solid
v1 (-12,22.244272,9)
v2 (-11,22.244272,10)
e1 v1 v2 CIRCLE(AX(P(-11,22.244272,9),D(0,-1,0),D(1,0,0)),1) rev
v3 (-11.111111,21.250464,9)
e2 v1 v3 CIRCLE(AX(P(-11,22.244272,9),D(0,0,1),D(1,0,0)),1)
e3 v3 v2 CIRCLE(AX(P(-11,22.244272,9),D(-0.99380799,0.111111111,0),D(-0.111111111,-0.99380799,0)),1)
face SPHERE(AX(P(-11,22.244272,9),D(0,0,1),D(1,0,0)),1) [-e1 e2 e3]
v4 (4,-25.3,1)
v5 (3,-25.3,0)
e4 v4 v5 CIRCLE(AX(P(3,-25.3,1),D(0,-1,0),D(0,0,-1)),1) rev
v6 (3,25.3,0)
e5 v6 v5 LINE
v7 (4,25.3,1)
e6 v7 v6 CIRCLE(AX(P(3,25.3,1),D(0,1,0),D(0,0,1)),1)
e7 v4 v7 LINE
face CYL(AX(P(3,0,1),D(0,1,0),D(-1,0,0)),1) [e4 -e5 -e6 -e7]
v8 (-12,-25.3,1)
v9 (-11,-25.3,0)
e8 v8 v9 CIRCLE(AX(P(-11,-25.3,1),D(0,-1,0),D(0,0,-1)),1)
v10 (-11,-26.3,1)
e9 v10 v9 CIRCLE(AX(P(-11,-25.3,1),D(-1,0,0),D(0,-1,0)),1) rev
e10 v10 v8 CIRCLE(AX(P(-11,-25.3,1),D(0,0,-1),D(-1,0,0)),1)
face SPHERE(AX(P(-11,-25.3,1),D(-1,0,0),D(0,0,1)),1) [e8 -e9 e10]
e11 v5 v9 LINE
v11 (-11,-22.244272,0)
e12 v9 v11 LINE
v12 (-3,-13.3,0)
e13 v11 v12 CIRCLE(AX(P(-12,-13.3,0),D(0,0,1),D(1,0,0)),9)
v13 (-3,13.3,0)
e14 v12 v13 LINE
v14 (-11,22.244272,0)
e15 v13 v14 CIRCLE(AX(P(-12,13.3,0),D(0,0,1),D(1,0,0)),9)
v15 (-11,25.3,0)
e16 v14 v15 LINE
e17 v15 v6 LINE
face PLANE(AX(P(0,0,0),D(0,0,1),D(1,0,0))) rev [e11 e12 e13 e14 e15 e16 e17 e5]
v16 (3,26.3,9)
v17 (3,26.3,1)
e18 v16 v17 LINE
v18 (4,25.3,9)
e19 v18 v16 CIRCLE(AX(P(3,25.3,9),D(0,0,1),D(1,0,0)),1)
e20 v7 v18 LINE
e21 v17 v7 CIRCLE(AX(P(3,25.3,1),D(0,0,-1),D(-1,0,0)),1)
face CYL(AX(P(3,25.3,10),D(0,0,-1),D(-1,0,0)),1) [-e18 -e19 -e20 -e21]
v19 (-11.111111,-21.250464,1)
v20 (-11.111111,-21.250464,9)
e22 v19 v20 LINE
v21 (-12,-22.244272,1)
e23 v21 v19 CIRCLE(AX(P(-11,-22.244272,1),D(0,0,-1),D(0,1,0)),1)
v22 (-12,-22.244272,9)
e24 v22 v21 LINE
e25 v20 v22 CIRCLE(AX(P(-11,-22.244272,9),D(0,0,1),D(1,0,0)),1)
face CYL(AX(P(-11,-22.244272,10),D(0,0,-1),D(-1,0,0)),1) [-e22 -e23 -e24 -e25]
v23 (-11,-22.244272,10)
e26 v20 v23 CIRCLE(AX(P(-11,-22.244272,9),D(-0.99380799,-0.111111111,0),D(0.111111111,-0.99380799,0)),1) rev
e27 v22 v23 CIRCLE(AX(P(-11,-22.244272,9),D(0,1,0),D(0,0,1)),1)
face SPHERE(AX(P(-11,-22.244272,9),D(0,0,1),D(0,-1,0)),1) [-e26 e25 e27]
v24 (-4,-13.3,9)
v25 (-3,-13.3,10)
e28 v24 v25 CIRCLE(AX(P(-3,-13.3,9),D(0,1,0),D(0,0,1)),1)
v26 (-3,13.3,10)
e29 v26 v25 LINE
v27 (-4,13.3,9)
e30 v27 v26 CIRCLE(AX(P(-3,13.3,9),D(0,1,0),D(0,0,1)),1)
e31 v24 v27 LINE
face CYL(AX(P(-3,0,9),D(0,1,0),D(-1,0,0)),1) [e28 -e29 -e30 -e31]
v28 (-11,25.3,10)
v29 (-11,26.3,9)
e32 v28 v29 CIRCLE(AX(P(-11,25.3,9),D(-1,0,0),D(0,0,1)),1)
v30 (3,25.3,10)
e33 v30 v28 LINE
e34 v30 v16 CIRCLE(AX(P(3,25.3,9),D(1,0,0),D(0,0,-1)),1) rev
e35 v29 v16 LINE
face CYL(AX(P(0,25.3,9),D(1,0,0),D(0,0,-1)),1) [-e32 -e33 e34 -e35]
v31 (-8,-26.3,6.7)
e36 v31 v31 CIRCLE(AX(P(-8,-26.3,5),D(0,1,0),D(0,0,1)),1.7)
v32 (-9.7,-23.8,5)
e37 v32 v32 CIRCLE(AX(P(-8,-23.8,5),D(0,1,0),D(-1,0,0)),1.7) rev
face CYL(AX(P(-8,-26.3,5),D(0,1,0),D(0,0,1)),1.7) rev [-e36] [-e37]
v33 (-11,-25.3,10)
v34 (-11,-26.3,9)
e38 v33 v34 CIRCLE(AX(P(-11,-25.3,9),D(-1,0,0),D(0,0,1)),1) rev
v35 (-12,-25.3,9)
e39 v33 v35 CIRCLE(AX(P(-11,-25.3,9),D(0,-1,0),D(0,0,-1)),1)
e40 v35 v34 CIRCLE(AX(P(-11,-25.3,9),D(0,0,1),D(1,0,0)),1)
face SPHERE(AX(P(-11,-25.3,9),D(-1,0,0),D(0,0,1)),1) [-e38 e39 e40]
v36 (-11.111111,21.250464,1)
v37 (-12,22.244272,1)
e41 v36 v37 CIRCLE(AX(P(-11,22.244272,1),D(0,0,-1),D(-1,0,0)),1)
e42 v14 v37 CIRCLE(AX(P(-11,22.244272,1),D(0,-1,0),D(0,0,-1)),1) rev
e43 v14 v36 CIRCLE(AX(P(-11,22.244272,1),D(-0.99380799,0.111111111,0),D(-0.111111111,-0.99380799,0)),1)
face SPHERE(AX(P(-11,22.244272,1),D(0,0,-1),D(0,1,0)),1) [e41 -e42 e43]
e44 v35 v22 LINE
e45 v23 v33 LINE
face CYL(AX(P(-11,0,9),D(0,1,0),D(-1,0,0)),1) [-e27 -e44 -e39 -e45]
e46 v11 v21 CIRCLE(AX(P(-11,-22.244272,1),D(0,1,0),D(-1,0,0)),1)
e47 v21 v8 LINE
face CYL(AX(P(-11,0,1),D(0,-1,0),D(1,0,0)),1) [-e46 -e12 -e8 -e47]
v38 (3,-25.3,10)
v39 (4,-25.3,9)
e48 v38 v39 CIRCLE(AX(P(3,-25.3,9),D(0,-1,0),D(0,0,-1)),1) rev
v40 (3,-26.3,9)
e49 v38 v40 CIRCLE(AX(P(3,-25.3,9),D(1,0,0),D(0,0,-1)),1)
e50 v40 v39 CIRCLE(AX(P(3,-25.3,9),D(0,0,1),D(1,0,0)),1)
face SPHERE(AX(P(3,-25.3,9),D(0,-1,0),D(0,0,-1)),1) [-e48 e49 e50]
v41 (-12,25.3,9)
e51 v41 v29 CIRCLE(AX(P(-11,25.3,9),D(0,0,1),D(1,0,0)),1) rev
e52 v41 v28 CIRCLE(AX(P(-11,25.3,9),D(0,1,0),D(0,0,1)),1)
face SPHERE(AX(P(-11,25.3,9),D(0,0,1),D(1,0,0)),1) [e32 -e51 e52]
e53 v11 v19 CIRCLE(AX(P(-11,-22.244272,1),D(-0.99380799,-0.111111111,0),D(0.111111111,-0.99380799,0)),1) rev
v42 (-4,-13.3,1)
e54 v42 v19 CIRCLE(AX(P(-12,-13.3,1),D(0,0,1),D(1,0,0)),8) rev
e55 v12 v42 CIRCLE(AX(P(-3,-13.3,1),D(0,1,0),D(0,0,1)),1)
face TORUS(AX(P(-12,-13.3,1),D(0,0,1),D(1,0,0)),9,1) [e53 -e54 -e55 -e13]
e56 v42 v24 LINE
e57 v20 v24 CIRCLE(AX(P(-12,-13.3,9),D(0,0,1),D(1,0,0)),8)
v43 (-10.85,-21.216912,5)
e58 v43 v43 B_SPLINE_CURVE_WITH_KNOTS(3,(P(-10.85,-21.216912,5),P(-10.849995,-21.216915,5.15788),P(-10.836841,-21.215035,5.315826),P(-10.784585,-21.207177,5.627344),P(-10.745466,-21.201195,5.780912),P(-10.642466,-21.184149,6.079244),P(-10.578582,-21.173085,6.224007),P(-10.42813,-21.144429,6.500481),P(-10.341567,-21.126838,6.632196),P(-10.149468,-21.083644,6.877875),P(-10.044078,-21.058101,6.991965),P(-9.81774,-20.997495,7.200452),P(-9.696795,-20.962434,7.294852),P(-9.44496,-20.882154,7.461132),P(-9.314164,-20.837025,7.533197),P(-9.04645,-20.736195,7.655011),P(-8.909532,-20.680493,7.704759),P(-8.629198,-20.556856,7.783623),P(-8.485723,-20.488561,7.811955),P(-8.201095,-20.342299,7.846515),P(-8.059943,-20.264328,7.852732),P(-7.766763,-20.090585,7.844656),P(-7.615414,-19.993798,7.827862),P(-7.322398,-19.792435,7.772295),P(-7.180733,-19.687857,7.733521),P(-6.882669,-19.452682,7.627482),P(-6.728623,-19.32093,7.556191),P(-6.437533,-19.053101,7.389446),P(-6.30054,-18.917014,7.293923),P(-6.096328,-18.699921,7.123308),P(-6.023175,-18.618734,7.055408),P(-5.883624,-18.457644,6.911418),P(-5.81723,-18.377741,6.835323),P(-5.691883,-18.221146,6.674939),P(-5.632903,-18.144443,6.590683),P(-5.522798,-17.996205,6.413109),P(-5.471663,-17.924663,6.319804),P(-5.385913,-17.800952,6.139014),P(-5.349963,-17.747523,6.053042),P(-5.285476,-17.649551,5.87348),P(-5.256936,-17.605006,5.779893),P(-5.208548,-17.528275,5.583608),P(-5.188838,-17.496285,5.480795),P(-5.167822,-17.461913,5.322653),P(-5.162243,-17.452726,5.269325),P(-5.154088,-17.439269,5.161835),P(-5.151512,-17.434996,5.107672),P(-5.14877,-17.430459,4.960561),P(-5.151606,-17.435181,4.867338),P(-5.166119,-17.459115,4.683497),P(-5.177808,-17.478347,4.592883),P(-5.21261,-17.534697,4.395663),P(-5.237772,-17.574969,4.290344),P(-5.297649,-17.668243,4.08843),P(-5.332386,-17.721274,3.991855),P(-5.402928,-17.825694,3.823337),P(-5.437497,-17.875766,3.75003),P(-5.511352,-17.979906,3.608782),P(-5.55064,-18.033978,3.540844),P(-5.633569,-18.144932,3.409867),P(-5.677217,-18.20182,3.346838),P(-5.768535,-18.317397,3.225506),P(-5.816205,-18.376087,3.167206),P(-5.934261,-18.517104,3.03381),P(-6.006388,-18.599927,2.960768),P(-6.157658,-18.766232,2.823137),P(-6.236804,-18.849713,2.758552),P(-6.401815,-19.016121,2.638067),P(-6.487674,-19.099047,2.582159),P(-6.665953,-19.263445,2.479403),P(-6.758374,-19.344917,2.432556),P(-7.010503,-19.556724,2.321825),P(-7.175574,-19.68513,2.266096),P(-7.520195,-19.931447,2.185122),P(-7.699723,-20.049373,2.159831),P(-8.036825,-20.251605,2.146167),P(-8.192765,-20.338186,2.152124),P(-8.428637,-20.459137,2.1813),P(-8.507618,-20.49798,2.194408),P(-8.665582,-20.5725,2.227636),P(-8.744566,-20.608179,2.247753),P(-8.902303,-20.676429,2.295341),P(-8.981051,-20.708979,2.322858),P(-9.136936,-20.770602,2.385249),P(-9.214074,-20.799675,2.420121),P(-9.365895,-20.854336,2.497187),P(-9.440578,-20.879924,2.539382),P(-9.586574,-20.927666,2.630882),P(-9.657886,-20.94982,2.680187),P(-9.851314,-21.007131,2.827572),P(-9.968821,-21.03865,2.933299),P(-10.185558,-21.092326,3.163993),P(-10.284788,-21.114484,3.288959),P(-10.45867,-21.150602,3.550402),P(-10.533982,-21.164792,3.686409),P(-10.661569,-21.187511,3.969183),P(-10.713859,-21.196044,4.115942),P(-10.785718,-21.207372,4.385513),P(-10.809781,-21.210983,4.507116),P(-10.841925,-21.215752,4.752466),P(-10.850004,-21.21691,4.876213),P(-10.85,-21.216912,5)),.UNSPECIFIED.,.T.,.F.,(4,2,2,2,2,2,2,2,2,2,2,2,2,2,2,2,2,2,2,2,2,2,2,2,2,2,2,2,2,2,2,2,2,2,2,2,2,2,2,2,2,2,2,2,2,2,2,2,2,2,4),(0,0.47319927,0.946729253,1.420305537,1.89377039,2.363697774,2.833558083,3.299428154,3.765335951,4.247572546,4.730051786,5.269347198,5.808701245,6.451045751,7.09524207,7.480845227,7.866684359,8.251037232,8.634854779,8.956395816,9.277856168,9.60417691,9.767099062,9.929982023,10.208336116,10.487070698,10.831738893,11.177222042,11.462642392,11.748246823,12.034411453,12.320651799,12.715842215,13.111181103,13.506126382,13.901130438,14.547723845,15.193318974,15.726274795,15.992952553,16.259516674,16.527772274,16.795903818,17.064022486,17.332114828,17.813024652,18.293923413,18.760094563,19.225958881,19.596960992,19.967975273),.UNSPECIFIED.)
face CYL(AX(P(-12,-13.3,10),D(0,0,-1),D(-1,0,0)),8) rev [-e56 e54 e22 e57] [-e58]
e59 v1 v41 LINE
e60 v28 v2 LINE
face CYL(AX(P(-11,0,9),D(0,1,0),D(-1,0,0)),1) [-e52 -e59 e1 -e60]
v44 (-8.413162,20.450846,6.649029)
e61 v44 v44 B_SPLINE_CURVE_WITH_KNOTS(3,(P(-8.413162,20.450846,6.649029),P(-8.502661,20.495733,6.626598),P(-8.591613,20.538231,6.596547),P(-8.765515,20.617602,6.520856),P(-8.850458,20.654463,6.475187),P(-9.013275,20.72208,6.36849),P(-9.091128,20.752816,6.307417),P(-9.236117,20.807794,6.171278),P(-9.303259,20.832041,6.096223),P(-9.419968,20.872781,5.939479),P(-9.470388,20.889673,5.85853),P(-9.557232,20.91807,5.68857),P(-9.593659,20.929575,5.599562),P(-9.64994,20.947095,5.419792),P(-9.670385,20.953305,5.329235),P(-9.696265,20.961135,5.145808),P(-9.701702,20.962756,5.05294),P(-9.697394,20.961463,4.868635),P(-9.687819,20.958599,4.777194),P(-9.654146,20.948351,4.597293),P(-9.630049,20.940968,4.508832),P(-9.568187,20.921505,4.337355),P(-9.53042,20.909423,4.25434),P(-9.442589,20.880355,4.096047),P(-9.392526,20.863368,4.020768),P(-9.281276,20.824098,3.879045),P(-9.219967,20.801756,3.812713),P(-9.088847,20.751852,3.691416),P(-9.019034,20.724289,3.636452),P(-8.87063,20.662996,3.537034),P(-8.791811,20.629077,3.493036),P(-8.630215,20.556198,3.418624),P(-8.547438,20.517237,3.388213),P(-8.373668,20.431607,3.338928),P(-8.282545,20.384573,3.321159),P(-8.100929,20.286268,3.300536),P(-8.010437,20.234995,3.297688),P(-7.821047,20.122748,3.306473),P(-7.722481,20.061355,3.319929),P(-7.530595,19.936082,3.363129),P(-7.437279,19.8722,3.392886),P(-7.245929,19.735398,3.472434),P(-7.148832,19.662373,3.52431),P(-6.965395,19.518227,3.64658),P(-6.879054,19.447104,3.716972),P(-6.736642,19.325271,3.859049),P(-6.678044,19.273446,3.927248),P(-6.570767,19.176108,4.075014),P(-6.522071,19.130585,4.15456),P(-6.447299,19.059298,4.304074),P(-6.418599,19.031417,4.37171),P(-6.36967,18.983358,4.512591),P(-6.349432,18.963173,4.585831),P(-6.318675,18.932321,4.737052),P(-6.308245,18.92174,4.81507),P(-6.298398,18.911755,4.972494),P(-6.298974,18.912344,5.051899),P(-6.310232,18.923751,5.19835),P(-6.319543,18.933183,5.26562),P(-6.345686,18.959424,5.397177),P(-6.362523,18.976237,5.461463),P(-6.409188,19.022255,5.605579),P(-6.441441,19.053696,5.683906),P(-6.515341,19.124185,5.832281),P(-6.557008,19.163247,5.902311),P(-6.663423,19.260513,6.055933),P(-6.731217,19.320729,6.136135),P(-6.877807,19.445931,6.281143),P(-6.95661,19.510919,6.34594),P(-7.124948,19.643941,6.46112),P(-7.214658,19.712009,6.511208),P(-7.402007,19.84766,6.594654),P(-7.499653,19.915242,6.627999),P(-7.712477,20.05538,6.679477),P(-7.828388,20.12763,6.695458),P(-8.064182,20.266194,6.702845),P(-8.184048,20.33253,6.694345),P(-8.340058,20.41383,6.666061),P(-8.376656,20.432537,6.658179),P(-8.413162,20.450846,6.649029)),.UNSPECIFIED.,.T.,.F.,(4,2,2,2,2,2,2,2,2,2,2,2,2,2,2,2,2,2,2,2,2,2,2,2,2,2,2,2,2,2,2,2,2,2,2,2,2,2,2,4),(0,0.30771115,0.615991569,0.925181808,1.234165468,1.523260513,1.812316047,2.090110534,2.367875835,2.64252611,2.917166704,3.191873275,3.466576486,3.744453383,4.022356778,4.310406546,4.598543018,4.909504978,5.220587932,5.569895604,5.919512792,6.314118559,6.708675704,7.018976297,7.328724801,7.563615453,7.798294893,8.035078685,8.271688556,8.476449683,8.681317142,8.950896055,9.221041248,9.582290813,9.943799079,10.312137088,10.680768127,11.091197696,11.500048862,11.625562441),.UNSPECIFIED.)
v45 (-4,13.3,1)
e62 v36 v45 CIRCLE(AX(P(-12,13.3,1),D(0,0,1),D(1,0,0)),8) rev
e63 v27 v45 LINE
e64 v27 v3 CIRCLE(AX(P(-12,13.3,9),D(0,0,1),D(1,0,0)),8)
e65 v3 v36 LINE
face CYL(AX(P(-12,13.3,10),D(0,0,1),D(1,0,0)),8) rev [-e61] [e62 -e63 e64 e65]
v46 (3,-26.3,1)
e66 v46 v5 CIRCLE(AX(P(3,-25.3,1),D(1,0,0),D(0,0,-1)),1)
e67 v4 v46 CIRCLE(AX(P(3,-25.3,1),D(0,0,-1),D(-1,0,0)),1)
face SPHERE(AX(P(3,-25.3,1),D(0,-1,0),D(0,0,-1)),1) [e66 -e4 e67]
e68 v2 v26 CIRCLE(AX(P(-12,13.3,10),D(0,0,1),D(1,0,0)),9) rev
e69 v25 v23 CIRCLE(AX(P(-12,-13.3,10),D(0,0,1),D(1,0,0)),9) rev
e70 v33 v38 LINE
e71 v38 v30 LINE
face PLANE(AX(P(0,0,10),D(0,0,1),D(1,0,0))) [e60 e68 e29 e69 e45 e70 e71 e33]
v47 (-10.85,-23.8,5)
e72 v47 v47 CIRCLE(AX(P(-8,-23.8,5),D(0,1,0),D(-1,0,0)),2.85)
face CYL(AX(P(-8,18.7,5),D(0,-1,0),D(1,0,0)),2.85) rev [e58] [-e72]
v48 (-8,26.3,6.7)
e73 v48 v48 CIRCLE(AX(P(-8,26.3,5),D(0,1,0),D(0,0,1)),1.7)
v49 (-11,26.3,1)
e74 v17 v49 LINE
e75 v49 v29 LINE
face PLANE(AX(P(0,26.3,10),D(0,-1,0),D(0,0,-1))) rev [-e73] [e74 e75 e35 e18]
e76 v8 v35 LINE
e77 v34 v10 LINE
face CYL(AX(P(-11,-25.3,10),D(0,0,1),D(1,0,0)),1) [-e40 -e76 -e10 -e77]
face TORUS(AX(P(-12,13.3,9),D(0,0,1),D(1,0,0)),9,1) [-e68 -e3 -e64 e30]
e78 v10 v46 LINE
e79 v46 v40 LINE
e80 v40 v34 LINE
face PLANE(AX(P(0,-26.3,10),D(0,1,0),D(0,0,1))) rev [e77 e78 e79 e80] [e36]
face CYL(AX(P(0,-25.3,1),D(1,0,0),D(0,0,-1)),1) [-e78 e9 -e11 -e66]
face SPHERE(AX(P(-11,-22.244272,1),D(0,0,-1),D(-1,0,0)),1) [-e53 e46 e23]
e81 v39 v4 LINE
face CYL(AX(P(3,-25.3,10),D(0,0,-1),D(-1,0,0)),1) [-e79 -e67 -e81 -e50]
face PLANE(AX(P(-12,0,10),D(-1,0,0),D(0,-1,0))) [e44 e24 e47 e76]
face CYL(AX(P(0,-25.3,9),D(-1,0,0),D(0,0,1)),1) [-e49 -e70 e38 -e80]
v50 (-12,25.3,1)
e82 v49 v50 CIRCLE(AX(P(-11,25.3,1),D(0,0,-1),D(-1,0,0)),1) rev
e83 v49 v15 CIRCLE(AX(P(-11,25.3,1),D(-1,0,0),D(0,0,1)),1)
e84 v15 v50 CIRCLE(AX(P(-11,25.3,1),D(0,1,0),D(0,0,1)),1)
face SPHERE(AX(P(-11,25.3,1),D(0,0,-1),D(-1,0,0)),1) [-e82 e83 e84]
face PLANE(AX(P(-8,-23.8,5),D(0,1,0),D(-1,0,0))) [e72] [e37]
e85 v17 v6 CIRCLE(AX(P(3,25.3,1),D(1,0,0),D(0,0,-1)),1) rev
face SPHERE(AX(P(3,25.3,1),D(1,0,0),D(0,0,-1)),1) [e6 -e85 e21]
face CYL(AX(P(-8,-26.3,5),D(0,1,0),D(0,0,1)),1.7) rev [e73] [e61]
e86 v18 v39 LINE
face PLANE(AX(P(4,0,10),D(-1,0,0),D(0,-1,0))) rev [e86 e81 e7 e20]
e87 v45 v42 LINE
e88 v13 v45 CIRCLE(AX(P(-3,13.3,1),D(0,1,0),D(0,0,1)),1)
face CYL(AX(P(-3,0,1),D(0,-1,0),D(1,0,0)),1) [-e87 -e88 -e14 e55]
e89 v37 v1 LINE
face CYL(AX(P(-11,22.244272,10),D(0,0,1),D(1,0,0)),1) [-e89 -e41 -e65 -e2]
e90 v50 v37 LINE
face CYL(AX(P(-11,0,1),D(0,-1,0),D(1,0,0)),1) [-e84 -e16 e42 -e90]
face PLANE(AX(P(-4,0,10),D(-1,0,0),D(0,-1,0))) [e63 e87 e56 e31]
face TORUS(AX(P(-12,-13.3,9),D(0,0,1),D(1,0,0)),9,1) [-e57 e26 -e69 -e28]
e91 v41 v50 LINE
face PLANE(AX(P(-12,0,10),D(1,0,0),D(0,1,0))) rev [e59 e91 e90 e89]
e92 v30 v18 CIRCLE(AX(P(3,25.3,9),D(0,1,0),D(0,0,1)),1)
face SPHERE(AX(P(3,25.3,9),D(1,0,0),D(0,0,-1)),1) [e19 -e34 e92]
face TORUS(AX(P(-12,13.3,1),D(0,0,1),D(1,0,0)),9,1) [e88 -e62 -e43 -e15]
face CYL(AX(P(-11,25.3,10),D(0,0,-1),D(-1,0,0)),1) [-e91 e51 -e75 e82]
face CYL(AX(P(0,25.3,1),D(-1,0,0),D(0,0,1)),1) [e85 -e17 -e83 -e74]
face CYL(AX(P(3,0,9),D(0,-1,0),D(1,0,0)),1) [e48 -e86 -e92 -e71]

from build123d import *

# Parameters (mm, degrees)
SKETCH1_W               = 8
SKETCH1_H               = 5
SKETCH1_H_2             = 52.6
BOSS_EXTRUDE1_DEPTH     = 10
SKETCH2_R               = 1.7
CUT_EXTRUDE1_DEPTH      = 55.870392745
CUT_EXTRUDE2_DEPTH      = 40
CUT_EXTRUDE2_DEPTH_BACK = 2.5
SKETCH3_R               = 2.85
FILLET1_DEPTH           = 2.1499999
FILLET1_START           = 7.8500001
FILLET1_2_DEPTH         = 2.1499999
FILLET1_START_2         = 0.9438
FILLET1_3_DEPTH         = 2.356451924
FILLET1_START_3         = 6.7000001
FILLET1_4_DEPTH         = 2.2437999
FILLET1_START_4         = 2.1499999
FILLET1_5_DEPTH         = 5.7000002
FILLET1_6_OUTLINE_W     = 1.7
FILLET1_6_OUTLINE_H     = 2.386959423
FILLET1_6_OUTLINE_W_2   = 2.85
FILLET1_6_OUTLINE_H_2   = 3.868292879
FILLET2_R               = 1


with BuildPart() as part:
    # Sketch1 → Boss-Extrude1 (new body)
    with BuildSketch(Plane.XY):
        with Locations((-8, 23.8)):
            Rectangle(SKETCH1_W, SKETCH1_H)
        Rectangle(SKETCH1_W, SKETCH1_H_2)
        with Locations((-8, -23.8)):
            Rectangle(SKETCH1_W, SKETCH1_H)
    extrude(amount=BOSS_EXTRUDE1_DEPTH)

    # Sketch2 → Cut-Extrude1 (cut, through all)
    with BuildSketch(Plane(origin=(0, 26.3, 0), x_dir=(1, 0, 0), z_dir=(0, 1, 0))):
        with Locations(Location((-8, -5, 0), (0, 0, 270))):
            Circle(SKETCH2_R)
    extrude(amount=-CUT_EXTRUDE1_DEPTH, mode=Mode.SUBTRACT)

    # Sketch3 → Cut-Extrude2 (cut, two sides: drawn at the far end of the back side and taken through both)
    with BuildSketch(Plane(origin=(0, -21.3, 0), x_dir=(1, 0, 0), z_dir=(0, 1, 0)).offset(-CUT_EXTRUDE2_DEPTH_BACK)):
        with Locations((-8, -5)):
            Circle(SKETCH3_R)
    extrude(amount=CUT_EXTRUDE2_DEPTH + CUT_EXTRUDE2_DEPTH_BACK, mode=Mode.SUBTRACT)

    # Fillet1: read off the stored shape, not the designer's step
    # Fillet1 outline → Fillet1 (add)
    with BuildSketch(Plane.XY):
        with BuildLine():
            ThreePointArc((-12, 21.3), (-6.343145751, 18.956854249), (-4, 13.3))
            Line((-4, 13.3), (-4, 21.3))
            Line((-4, 21.3), (-12, 21.3))
        make_face()
        with BuildLine():
            Line((-4, -21.3), (-4, -13.3))
            ThreePointArc((-4, -13.3), (-6.343145751, -18.956854249), (-12, -21.3))
            Line((-12, -21.3), (-4, -21.3))
        make_face()
    extrude(amount=FILLET1_DEPTH)

    # Fillet1 2 outline → Fillet1 2 (add)
    with BuildSketch(Plane.XY.offset(FILLET1_START)):
        with BuildLine():
            ThreePointArc((-12, 21.3), (-6.343145751, 18.956854249), (-4, 13.3))
            Line((-4, 13.3), (-4, 21.3))
            Line((-4, 21.3), (-12, 21.3))
        make_face()
        with BuildLine():
            Line((-4, -21.3), (-4, -13.3))
            ThreePointArc((-4, -13.3), (-6.343145751, -18.956854249), (-12, -21.3))
            Line((-12, -21.3), (-4, -21.3))
        make_face()
    extrude(amount=FILLET1_2_DEPTH)

    # Fillet1 3 outline → Fillet1 3 (add)
    with BuildSketch(Plane.XY.offset(FILLET1_START_2)):
        with BuildLine():
            ThreePointArc((-12, 21.3), (-6.343145751, 18.956854249), (-4, 13.3))
            Line((-4, 13.3), (-4, 21.3))
            Line((-4, 21.3), (-12, 21.3))
        make_face()
    extrude(amount=FILLET1_3_DEPTH)

    # Fillet1 4 outline → Fillet1 4 (add)
    with BuildSketch(Plane.XY.offset(FILLET1_START_3)):
        with BuildLine():
            ThreePointArc((-12, 21.3), (-6.343145751, 18.956854249), (-4, 13.3))
            Line((-4, 13.3), (-4, 21.3))
            Line((-4, 21.3), (-12, 21.3))
        make_face()
    extrude(amount=FILLET1_4_DEPTH)

    # Fillet1 5 outline → Fillet1 5 (add)
    with BuildSketch(Plane.XY.offset(FILLET1_START_4)):
        with BuildLine():
            ThreePointArc((-12, 21.3), (-6.343145751, 18.956854249), (-4, 13.3))
            Line((-4, 13.3), (-4, 21.3))
            Line((-4, 21.3), (-12, 21.3))
        make_face()
        with BuildLine():
            Line((-4, -21.3), (-4, -13.3))
            ThreePointArc((-4, -13.3), (-6.343145751, -18.956854249), (-12, -21.3))
            Line((-12, -21.3), (-4, -21.3))
        make_face()
    extrude(amount=FILLET1_5_DEPTH)

    # Fillet1 6 outline → Fillet1 6 (revolve, cut)
    with BuildSketch(Plane(origin=(-8, 0, 5), x_dir=(1, 0, 0), z_dir=(0, 0, 1))):
        with Locations((0.85, 20.106520289)):
            Rectangle(FILLET1_6_OUTLINE_W, FILLET1_6_OUTLINE_H)
        with Locations((1.425, -19.36585356)):
            Rectangle(FILLET1_6_OUTLINE_W_2, FILLET1_6_OUTLINE_H_2)
    revolve(axis=Axis((-8, 0, 5), (0, 1, 0)), mode=Mode.SUBTRACT)

    # Fillet2
    fillet2_edges = [part.edges().sort_by_distance(p)[0] for p in [
        (4, 0, 0),
        (-4, -26.3, 0),
        (-12, -23.8, 0),
        (-12, 23.8, 10),
        (-12, 23.8, 0),
        (-4, 26.3, 0),
        (4, 26.3, 5),
        (4, -26.3, 5),
        (-12, -26.3, 5),
        (-12, -21.3, 5),
        (-12, 21.3, 5),
        (-12, 26.3, 5),
        (-12, -23.8, 10),
        (-4, -26.3, 10),
        (4, 0, 10),
        (-4, 0, 0),
        (-4, 0, 10),
        (-6.343145751, 18.956854249, 0),
        (-4, 26.3, 10),
        (-6.343145751, 18.956854249, 10),
        (-6.343145751, -18.956854249, 0),
        (-6.343145751, -18.956854249, 10),
    ]]
    fillet(fillet2_edges, radius=FILLET2_R)


solid = part.part
